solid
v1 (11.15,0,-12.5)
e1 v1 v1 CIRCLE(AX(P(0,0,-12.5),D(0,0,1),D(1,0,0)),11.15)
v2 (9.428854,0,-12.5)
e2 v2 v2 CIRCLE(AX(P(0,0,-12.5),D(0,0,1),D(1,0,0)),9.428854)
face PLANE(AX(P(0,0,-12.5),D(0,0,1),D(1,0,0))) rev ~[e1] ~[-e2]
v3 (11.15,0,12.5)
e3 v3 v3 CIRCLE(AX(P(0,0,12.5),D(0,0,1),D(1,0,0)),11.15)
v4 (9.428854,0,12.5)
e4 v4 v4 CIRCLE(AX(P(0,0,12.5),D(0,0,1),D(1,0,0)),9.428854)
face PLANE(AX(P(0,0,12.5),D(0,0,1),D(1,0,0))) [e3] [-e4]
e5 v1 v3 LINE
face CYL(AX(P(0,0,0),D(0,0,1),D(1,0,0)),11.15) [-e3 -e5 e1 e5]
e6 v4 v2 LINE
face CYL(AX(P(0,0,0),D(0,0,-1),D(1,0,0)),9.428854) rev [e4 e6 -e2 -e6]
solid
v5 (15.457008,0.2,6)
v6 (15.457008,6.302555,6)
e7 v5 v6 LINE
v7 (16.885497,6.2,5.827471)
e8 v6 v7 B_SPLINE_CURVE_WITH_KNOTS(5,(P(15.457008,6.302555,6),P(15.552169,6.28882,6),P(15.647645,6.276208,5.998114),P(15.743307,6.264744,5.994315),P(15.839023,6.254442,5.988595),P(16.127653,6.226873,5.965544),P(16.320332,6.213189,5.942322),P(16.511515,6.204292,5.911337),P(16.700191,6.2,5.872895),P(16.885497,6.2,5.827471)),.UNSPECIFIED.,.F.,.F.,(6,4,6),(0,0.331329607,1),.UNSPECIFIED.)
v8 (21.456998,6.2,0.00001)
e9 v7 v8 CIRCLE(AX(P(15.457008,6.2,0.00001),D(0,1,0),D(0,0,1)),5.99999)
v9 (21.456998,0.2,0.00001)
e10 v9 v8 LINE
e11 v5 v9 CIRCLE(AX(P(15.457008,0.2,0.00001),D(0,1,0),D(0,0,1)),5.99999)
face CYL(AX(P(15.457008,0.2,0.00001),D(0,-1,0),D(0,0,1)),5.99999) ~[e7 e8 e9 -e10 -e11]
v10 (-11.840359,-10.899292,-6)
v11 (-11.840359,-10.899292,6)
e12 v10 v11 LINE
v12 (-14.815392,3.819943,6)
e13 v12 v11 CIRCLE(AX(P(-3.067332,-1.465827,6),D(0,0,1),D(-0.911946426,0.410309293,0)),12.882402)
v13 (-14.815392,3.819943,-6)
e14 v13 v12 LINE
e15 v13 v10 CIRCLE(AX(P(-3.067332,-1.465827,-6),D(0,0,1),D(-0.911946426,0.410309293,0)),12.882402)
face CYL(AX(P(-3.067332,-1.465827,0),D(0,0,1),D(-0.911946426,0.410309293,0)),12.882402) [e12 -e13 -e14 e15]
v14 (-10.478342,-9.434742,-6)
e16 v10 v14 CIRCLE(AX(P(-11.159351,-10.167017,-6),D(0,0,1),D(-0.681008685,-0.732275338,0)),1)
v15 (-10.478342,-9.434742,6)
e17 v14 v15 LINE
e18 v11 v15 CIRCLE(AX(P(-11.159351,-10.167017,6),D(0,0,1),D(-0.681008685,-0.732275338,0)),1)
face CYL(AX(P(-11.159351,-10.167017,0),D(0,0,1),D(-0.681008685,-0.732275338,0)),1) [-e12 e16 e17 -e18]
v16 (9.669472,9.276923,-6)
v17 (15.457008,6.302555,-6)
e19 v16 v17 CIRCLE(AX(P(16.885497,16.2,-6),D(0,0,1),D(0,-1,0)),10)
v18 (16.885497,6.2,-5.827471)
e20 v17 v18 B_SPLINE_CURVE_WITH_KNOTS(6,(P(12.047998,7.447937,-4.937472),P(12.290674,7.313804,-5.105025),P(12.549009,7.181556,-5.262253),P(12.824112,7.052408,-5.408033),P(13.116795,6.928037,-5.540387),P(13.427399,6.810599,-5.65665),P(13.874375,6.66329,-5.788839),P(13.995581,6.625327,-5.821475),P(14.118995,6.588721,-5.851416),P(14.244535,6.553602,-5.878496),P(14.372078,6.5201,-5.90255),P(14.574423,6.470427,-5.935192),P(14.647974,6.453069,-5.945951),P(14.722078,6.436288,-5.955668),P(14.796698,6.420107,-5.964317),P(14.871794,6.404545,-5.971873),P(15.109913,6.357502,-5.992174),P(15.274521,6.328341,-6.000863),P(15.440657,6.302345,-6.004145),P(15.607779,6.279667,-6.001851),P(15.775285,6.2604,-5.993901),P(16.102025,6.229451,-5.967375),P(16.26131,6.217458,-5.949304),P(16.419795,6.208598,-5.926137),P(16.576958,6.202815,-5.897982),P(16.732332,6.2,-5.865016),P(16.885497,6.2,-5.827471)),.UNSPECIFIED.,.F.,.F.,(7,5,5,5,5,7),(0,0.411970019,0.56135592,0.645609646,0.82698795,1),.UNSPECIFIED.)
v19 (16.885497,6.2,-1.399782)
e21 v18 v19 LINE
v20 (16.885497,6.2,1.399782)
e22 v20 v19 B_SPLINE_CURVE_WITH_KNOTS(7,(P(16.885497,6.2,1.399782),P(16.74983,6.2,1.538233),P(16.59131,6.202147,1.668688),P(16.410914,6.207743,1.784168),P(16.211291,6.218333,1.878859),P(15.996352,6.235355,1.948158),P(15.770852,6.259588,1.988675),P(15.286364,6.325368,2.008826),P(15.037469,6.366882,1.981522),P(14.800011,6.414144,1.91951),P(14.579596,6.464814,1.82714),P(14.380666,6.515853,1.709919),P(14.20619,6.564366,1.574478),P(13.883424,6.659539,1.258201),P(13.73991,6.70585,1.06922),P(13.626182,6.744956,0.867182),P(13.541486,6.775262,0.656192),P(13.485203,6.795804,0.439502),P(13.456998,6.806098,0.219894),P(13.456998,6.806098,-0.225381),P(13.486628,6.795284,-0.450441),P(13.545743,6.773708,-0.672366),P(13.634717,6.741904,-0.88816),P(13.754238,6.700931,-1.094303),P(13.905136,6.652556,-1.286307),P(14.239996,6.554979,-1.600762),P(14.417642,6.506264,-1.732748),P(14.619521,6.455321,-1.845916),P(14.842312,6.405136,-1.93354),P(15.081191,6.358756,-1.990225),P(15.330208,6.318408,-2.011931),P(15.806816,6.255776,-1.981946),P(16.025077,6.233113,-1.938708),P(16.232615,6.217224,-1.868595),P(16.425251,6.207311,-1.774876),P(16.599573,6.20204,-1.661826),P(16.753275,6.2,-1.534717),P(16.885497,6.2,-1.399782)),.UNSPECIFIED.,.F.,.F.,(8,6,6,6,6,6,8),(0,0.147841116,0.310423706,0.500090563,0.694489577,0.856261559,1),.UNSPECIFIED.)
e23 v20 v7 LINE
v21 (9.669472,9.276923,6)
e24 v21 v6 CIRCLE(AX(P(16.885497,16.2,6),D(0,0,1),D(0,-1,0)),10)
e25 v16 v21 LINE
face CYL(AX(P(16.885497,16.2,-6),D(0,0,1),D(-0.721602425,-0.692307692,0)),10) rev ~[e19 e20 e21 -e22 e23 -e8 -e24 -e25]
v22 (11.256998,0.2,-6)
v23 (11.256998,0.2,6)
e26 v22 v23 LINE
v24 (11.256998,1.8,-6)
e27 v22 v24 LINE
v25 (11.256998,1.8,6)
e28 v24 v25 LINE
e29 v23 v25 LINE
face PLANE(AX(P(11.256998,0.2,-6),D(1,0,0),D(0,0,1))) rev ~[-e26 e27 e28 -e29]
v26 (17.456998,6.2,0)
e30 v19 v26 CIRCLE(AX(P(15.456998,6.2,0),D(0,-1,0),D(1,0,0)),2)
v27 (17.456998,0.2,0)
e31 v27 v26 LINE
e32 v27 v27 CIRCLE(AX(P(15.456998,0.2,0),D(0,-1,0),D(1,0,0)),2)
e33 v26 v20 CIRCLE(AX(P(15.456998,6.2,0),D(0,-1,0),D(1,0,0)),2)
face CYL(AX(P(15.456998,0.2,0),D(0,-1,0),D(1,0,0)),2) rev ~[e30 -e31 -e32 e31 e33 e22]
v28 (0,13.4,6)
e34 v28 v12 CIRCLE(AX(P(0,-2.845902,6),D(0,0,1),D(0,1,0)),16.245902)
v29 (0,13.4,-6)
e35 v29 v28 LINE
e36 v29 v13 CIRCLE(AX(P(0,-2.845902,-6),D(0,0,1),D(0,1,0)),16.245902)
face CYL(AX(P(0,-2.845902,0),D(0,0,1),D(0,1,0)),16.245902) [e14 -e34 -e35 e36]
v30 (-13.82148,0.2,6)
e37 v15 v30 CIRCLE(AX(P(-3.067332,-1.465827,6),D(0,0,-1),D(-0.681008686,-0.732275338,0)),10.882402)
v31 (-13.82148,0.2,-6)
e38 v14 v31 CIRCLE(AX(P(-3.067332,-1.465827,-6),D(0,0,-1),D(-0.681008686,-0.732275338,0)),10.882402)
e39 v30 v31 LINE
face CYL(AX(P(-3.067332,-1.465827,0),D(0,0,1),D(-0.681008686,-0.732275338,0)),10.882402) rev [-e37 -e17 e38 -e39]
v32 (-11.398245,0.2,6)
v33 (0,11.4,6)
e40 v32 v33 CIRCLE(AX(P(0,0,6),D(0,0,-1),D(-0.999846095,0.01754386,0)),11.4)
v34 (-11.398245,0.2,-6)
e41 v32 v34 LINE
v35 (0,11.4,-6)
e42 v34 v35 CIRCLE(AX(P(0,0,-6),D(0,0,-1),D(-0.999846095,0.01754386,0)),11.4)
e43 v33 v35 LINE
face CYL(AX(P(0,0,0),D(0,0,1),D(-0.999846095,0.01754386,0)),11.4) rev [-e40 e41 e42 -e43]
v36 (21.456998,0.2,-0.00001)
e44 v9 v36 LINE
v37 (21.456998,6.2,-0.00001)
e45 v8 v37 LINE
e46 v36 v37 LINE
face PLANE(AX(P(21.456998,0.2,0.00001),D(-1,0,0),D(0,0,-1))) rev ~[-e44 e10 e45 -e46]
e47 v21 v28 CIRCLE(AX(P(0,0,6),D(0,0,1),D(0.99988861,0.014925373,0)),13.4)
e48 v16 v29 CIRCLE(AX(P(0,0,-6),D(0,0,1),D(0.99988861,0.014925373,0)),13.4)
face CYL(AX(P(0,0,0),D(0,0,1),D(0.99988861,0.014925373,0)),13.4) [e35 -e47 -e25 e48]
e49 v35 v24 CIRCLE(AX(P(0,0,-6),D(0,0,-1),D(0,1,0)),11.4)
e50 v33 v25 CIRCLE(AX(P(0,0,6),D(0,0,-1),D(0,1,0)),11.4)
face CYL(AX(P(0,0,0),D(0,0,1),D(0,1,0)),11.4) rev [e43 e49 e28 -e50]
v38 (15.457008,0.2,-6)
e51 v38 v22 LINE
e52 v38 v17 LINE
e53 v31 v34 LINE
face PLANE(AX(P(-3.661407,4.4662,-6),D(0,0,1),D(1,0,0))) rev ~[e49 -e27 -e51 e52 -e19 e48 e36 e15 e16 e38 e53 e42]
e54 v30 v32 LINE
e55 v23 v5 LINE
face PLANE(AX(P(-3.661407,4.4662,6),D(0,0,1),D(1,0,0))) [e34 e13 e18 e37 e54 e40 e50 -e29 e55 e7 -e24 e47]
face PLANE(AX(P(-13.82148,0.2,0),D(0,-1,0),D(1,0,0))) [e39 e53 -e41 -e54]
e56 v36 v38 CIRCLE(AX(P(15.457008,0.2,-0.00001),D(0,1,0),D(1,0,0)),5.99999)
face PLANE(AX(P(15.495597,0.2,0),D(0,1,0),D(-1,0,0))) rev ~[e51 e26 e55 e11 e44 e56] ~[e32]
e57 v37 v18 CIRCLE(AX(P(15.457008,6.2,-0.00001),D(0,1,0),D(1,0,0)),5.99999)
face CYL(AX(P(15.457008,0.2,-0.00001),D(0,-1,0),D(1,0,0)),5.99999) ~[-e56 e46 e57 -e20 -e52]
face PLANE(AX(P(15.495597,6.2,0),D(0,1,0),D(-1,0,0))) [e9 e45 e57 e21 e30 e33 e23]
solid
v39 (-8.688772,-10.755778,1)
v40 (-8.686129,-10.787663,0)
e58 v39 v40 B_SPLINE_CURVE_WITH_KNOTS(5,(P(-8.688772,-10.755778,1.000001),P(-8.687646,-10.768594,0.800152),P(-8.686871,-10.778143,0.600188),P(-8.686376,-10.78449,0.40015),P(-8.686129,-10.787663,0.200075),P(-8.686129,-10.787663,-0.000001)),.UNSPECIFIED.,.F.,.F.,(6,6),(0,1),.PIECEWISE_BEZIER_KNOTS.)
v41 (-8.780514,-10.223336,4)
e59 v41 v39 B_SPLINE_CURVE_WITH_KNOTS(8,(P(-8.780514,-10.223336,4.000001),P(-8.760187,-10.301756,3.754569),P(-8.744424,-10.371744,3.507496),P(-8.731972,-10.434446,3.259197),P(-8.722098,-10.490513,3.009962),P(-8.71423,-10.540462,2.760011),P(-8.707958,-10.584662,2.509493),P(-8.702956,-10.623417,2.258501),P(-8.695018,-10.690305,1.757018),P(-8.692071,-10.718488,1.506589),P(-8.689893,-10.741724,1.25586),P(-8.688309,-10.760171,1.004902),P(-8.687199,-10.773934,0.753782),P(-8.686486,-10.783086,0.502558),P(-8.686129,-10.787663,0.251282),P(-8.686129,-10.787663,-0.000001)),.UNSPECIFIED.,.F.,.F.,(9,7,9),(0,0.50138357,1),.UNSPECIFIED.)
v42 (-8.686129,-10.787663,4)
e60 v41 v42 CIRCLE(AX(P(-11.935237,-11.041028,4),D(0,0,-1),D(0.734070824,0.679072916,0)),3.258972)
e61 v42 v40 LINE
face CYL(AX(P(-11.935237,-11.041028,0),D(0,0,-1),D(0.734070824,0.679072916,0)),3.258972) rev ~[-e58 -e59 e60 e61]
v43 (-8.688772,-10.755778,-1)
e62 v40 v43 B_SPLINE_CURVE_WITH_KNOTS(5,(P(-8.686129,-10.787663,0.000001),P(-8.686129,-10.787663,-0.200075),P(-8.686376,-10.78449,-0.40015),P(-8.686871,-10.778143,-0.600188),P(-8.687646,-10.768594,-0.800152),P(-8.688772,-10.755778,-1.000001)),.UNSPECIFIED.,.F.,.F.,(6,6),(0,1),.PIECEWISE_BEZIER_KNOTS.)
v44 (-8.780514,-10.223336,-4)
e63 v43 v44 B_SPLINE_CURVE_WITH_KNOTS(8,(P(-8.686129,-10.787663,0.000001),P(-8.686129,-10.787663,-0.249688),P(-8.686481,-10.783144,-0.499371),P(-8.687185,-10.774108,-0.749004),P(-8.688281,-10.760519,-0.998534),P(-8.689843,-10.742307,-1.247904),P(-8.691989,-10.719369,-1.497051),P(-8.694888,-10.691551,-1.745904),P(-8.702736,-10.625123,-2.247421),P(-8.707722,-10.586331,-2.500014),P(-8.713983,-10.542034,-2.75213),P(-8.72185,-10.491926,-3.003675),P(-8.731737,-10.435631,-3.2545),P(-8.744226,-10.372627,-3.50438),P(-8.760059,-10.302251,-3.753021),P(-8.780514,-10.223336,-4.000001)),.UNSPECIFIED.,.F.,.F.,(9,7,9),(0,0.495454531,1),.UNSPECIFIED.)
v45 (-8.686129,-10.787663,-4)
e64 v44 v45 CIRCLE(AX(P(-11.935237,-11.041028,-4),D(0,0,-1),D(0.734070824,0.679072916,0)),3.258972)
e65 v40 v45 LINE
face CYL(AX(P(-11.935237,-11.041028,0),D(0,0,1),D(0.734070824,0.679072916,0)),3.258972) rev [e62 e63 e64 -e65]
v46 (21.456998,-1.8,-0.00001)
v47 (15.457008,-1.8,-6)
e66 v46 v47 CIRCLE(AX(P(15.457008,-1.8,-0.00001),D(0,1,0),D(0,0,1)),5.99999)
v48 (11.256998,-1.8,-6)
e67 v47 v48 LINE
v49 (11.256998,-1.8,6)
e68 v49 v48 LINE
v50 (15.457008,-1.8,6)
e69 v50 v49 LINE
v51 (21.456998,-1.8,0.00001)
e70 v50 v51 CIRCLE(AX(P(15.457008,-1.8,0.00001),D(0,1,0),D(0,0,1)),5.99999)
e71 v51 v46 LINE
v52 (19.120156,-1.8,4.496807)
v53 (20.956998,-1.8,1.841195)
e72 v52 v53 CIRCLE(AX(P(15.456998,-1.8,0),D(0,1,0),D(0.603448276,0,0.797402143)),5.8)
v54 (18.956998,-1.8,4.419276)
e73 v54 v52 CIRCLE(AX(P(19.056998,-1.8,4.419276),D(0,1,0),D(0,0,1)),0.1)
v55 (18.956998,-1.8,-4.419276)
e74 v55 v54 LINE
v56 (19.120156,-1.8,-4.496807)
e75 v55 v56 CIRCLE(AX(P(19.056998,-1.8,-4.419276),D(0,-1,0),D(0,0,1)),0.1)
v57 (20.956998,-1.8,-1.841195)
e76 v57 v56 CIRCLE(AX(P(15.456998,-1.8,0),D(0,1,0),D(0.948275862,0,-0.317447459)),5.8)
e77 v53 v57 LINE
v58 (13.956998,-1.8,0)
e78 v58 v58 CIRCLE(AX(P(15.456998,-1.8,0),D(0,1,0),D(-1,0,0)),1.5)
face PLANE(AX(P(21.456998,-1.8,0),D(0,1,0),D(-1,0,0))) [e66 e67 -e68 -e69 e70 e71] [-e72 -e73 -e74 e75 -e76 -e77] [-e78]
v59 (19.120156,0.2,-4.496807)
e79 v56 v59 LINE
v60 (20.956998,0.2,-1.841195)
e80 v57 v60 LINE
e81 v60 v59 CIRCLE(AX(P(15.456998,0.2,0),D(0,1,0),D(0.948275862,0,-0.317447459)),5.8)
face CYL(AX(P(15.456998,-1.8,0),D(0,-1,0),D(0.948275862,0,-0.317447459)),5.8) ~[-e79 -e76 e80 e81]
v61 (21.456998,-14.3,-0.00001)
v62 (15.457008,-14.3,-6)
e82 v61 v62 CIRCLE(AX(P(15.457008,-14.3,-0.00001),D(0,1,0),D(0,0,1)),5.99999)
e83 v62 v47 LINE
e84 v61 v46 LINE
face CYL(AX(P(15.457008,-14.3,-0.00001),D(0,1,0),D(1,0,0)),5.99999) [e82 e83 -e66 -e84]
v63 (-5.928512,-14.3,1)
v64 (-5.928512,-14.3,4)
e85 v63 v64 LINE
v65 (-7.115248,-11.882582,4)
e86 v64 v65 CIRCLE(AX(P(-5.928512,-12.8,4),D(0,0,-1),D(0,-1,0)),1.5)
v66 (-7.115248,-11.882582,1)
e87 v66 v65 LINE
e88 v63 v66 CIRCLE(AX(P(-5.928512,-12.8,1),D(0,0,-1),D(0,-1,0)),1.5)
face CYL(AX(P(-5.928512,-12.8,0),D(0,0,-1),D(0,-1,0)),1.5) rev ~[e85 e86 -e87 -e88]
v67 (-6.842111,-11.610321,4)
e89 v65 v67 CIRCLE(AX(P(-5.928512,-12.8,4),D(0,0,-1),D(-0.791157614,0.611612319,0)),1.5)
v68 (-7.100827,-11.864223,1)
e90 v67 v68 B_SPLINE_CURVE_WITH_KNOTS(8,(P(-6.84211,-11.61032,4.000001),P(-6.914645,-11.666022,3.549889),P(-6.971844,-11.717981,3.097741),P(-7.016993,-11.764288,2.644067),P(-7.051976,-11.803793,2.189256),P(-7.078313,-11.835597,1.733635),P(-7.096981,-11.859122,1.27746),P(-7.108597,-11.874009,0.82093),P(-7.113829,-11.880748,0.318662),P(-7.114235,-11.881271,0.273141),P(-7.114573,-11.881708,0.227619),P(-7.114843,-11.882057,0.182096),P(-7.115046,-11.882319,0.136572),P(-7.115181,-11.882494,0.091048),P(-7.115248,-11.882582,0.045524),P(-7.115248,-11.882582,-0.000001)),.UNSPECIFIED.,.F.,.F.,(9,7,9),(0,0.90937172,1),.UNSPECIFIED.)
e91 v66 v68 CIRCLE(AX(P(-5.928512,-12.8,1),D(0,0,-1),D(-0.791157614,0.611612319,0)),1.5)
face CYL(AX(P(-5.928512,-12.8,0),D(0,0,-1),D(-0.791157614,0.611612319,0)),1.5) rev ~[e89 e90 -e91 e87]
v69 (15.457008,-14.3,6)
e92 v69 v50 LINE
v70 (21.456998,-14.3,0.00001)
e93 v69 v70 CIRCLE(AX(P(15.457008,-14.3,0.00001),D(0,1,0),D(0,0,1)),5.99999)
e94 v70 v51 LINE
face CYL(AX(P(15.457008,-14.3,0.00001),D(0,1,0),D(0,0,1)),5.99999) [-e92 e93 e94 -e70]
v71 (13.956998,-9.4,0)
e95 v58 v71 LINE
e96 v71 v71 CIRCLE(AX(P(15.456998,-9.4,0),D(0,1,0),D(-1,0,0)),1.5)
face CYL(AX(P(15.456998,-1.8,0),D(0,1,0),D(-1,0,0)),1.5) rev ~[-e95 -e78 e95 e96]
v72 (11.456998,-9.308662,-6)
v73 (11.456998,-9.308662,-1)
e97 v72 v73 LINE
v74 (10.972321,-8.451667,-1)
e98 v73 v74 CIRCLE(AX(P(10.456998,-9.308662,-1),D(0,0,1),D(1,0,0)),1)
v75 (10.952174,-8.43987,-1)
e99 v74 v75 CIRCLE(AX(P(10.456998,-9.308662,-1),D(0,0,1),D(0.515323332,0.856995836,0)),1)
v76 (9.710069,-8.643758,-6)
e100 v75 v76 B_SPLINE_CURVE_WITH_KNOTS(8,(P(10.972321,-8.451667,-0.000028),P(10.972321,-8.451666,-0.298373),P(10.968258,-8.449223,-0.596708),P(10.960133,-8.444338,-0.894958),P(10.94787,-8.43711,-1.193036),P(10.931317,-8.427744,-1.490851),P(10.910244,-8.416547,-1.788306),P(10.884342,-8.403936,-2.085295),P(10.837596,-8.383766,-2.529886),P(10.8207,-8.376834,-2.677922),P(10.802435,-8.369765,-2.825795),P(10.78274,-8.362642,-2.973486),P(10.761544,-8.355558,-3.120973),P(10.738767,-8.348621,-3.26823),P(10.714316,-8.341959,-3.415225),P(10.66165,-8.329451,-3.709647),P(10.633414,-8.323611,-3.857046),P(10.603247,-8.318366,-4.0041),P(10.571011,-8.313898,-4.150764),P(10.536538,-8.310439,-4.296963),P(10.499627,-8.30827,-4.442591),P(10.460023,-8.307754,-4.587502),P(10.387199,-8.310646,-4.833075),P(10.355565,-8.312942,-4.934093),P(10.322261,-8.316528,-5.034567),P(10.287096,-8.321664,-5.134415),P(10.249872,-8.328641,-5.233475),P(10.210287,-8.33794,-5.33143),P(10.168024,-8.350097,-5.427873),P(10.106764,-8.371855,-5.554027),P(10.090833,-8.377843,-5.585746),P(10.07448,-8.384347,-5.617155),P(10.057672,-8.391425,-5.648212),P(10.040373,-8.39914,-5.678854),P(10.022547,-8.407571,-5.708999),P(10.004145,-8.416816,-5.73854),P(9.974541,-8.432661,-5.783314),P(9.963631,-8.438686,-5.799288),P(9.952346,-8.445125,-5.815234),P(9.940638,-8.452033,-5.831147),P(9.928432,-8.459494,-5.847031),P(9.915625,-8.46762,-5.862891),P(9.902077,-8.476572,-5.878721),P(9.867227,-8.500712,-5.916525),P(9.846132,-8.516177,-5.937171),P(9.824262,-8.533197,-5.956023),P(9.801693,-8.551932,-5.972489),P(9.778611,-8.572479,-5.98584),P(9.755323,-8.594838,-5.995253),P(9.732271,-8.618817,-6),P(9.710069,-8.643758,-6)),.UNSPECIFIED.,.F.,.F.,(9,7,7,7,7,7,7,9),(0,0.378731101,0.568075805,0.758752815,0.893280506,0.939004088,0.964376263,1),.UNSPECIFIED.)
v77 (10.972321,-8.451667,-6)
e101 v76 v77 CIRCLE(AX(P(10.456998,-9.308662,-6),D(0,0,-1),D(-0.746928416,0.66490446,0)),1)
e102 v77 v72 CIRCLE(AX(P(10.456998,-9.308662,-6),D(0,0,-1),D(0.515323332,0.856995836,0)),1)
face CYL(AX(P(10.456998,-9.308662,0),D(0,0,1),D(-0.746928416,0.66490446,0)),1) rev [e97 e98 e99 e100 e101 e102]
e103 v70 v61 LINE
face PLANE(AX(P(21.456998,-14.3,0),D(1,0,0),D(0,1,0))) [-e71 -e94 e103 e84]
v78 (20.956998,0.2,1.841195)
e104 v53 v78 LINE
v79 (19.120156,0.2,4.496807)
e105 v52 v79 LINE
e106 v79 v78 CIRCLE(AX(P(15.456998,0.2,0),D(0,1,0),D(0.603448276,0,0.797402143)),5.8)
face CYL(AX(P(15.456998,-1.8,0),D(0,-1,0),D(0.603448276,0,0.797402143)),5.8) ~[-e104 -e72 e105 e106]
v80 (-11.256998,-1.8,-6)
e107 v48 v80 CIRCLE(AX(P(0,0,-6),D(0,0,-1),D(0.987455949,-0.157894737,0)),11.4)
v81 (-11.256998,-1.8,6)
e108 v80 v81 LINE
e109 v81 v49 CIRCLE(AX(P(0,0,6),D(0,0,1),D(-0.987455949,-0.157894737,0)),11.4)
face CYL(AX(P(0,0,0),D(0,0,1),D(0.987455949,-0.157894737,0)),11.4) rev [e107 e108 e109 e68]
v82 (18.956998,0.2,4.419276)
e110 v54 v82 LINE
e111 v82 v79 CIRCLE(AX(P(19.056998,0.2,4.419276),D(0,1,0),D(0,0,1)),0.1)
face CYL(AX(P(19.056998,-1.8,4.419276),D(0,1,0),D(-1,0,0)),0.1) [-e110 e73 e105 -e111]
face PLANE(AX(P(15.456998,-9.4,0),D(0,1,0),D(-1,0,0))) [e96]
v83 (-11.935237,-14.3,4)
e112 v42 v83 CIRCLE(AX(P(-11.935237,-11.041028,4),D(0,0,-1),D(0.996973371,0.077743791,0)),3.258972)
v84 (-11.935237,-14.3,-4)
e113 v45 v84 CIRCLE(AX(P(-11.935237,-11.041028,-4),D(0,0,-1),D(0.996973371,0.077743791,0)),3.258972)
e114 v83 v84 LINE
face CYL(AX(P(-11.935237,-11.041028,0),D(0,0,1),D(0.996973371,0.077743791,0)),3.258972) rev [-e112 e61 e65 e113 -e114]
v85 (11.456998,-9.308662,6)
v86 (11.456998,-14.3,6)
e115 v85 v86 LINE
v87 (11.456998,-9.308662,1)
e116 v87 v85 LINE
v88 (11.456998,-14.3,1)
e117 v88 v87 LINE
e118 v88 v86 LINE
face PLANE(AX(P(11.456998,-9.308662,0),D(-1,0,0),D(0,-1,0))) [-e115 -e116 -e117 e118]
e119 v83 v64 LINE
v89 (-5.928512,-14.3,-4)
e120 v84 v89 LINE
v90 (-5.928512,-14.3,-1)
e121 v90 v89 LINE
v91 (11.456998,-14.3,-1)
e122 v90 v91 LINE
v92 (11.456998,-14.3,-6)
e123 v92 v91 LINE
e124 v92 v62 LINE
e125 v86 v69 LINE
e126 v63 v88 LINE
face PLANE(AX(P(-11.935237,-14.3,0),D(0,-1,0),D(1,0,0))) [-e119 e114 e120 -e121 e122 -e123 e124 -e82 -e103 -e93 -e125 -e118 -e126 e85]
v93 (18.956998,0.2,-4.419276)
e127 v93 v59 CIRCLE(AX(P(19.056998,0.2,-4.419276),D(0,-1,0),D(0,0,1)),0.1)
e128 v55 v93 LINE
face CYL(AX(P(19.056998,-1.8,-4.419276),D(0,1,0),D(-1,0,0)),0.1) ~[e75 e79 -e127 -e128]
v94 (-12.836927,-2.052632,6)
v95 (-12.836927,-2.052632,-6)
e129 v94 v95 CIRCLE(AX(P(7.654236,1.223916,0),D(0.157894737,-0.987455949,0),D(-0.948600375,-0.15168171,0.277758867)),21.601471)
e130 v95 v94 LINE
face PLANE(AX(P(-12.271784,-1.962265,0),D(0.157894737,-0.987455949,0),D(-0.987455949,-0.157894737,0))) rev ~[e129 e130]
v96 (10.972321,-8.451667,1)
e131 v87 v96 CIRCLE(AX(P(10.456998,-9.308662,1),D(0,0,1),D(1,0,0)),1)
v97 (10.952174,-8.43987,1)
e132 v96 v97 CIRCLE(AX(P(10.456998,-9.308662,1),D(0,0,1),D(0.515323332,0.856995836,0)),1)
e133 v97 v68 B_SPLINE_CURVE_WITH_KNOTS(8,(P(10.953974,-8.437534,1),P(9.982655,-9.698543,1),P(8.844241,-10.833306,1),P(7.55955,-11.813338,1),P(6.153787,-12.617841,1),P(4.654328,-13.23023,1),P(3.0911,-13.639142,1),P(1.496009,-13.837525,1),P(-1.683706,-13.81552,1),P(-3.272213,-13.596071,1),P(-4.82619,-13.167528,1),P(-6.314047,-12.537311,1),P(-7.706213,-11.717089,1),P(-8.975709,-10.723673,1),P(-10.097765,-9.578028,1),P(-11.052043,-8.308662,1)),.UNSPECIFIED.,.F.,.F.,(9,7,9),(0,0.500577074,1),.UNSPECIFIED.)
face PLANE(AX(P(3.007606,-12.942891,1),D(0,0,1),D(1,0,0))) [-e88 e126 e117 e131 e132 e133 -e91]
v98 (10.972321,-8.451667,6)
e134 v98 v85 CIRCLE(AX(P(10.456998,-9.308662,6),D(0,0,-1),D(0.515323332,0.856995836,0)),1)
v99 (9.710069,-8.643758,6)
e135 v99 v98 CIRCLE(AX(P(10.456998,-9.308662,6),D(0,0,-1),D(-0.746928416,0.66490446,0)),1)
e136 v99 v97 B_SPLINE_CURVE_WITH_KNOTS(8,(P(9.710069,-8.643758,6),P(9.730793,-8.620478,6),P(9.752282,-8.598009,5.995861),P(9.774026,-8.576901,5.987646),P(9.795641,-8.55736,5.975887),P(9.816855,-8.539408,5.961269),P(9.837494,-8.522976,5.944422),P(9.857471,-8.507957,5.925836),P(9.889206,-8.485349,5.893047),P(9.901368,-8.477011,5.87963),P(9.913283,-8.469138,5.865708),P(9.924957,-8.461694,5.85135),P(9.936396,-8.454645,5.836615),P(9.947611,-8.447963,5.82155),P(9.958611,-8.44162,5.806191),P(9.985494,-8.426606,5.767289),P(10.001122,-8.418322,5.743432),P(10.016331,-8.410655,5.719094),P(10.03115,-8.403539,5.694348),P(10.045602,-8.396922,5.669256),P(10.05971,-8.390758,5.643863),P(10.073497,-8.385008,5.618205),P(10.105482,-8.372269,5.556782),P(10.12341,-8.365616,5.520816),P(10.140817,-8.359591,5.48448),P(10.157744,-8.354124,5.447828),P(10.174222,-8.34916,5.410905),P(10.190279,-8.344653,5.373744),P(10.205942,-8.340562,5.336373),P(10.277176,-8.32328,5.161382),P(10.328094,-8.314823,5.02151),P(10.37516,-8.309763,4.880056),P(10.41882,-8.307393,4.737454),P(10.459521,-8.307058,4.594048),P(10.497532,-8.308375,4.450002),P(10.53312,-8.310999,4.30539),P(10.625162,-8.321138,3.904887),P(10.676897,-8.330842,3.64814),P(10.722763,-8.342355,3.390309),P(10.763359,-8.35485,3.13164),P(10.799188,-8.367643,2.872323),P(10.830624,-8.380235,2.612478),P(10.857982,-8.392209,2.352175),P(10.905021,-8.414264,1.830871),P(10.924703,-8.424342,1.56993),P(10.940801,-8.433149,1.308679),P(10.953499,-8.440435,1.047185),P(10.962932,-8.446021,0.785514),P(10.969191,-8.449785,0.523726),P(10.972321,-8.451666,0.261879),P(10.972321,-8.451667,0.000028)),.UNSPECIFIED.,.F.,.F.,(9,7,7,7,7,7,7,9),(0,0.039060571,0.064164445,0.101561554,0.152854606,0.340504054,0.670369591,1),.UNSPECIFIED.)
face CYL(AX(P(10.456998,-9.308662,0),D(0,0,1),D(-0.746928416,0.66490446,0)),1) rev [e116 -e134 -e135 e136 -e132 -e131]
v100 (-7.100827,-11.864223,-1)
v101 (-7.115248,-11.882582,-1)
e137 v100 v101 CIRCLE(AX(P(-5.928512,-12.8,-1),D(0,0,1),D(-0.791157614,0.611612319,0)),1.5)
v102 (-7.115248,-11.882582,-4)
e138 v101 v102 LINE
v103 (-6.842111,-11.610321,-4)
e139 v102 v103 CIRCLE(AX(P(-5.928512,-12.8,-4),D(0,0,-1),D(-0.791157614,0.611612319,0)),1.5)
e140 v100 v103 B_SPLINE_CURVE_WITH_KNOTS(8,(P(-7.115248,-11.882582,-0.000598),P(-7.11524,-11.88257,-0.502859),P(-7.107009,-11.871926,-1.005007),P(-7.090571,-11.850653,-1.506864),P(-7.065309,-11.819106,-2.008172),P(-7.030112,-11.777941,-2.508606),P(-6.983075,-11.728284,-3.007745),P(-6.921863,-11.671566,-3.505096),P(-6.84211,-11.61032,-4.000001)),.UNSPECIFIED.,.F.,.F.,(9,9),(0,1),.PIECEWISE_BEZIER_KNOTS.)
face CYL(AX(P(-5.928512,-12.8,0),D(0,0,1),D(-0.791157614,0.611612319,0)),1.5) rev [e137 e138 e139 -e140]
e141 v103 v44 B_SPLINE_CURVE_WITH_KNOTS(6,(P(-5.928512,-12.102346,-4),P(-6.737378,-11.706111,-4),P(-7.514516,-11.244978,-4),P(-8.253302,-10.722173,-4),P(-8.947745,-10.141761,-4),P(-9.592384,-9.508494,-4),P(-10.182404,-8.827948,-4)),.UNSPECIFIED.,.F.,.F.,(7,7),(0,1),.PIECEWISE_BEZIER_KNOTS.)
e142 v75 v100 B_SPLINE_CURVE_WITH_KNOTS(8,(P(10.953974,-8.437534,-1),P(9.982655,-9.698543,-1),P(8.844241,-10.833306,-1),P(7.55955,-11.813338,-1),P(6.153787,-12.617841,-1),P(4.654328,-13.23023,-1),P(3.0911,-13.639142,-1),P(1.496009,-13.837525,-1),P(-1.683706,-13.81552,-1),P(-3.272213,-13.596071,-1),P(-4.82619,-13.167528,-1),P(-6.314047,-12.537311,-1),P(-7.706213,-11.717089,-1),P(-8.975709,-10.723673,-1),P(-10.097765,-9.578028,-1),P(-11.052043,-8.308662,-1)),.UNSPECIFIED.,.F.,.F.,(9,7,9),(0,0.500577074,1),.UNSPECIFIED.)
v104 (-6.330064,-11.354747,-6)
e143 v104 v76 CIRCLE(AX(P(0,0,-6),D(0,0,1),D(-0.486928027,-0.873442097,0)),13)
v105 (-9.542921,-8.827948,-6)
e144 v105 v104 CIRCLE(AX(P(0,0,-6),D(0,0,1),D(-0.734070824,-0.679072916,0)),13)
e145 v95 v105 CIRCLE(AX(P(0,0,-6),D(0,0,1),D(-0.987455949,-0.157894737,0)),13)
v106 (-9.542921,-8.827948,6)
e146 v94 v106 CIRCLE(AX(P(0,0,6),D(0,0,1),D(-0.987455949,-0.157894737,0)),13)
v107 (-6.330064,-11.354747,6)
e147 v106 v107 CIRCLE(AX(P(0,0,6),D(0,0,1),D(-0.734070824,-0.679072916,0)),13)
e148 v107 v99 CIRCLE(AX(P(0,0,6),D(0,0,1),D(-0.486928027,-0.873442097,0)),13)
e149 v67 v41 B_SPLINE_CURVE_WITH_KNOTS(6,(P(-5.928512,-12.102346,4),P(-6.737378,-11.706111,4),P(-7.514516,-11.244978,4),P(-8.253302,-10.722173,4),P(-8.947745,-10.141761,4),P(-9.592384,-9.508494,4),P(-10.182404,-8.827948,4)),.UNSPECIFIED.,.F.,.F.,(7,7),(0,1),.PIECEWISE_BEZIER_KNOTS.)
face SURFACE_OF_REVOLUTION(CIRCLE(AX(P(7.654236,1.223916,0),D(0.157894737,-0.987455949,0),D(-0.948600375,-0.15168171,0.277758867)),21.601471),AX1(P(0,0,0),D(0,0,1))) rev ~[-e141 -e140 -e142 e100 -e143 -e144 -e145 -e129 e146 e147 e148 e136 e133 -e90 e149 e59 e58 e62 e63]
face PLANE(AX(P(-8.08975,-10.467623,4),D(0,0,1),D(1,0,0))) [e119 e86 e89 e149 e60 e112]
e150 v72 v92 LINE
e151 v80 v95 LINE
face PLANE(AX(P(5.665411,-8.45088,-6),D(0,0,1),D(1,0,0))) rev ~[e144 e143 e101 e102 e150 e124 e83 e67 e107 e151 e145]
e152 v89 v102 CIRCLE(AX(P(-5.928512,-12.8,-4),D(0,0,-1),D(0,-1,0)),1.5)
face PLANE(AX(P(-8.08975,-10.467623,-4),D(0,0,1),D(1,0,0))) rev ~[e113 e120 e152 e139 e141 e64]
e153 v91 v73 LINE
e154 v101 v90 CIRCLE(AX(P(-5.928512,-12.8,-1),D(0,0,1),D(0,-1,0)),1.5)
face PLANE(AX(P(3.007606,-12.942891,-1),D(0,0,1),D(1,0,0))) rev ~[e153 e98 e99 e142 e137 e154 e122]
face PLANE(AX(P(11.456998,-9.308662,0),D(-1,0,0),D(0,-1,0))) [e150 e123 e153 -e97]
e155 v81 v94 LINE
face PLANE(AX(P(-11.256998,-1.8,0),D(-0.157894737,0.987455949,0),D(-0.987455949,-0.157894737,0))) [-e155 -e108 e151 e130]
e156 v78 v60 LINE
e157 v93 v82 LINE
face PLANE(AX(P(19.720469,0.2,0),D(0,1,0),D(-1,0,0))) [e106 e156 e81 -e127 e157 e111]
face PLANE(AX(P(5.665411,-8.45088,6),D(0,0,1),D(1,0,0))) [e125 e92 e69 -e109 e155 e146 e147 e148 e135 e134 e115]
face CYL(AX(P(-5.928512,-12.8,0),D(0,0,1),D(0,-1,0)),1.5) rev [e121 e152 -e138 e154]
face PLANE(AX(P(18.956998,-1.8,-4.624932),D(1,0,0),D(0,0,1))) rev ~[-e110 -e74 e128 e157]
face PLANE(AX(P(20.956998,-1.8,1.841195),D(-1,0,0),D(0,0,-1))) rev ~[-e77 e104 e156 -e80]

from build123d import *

# Parameters (mm, degrees)
F0_R      = 11.15
F0_R_2    = 9.4288540256
F1_DEPTH  = 12.5
F4_DEPTH  = 6
F6_DEPTH  = 1
F7_DEPTH  = 4
F8_R      = 5.99999
F9_START  = 2
F9_DEPTH  = 6
F11_DEPTH = 2
F12_R     = 0.1
F10_R     = 1.5
F13_DEPTH = 7.6
F15_DEPTH = 6
F16_R     = 10
F17_R     = 2
F18_DEPTH = 25


# Not quite as in the source:
# - a fillet or chamfer is up to 0.001 mm smaller than in the source, because OpenCascade refuses the exact size


with BuildPart() as f1:
    # F0 (on Top) → F1 (new body, symmetric)
    with BuildSketch(Plane.XY):
        Circle(F0_R)
        Circle(F0_R_2, mode=Mode.SUBTRACT)
    extrude(amount=F1_DEPTH, both=True)


with BuildPart() as f4:
    # F2 (on Top) → F4 (new body, symmetric)
    with BuildSketch(Plane.XY):
        with BuildLine():
            ThreePointArc((11.2569978236, -1.8), (0, -11.4), (-11.2569978236, -1.8))
            Line((-11.2569978236, -1.8), (-12.8369273427, -2.0526315789))
            ThreePointArc((-12.8369273427, -2.0526315789), (-11.6914767069, -5.6841333915), (-9.5429207129, -8.827947908))
            ThreePointArc((-9.5429207129, -8.827947908), (-8.0364228667, -10.2184102241), (-6.3300643569, -11.3547472555))
            ThreePointArc((-6.3300643569, -11.3547472555), (2.1664427623, -12.8182107081), (9.7100694076, -8.6437579848))
            ThreePointArc((9.7100694076, -8.6437579848), (10.3065484867, -8.3200447248), (10.9723211553, -8.4516666087))
            ThreePointArc((10.9723211553, -8.4516666087), (11.3274354525, -8.8163837293), (11.4569978236, -9.3086624451))
            Line((11.4569978236, -9.3086624451), (11.4569978236, -14.3))
            Line((11.4569978236, -14.3), (21.4569978236, -14.3))
            Line((21.4569978236, -14.3), (21.4569978236, -1.8))
            Line((21.4569978236, -1.8), (11.2569978236, -1.8))
        make_face()
    extrude(amount=F4_DEPTH, both=True)

    # F5: sweep along a path in F2
    with BuildLine(Plane.XY) as f5_path:
        ThreePointArc((-13.6762648997, -2.1868421053), (-3.4117201611, -13.4232136816), (10.9723211553, -8.4516666087))
    # F3 (on Right) → F5 (sweep)
    with BuildSketch(Plane.YZ):
        with BuildLine():
            Line((-11.4, -6), (-11.4, 6))
            Line((-11.4, 6), (-13, 6))
            ThreePointArc((-13, 6), (-13.85, 0), (-13, -6))
            Line((-13, -6), (-11.4, -6))
        make_face()
    sweep(path=f5_path.line)

    # F2 (on Top) → F6 (join, symmetric)
    with BuildSketch(Plane.XY):
        with BuildLine():
            Line((-5.9285117394, -14.3), (11.4569978236, -14.3))
            Line((11.4569978236, -14.3), (11.4569978236, -9.3086624451))
            ThreePointArc((11.4569978236, -9.3086624451), (11.3274354525, -8.8163837293), (10.9723211553, -8.4516666087))
            ThreePointArc((10.9723211553, -8.4516666087), (2.5810942069, -13.6073675887), (-7.1152481611, -11.8825815211))
            ThreePointArc((-7.1152481611, -11.8825815211), (-7.2750123369, -13.4610114529), (-5.9285117394, -14.3))
        make_face()
        with BuildLine():
            ThreePointArc((9.7100694076, -8.6437579848), (2.1664427623, -12.8182107081), (-6.3300643569, -11.3547472555))
            ThreePointArc((-6.3300643569, -11.3547472555), (-6.7653616489, -11.5551376667), (-7.1152481611, -11.8825815211))
            ThreePointArc((-7.1152481611, -11.8825815211), (2.5810942069, -13.6073675887), (10.9723211553, -8.4516666087))
            ThreePointArc((10.9723211553, -8.4516666087), (10.3065484867, -8.3200447248), (9.7100694076, -8.6437579848))
        make_face()
        with BuildLine():
            ThreePointArc((-6.3300643569, -11.3547472555), (-8.0364228667, -10.2184102241), (-9.5429207129, -8.827947908))
            ThreePointArc((-9.5429207129, -8.827947908), (-8.9491796093, -9.7355161295), (-8.6861285989, -10.7876628592))
            ThreePointArc((-8.6861285989, -10.7876628592), (-7.91963311, -11.3623022052), (-7.1152481611, -11.8825815211))
            ThreePointArc((-7.1152481611, -11.8825815211), (-6.7653616489, -11.5551376667), (-6.3300643569, -11.3547472555))
        make_face()
        with BuildLine():
            ThreePointArc((-7.1152481611, -11.8825815211), (-7.91963311, -11.3623022052), (-8.6861285989, -10.7876628592))
            ThreePointArc((-8.6861285989, -10.7876628592), (-9.5428942517, -13.2540789242), (-11.9352371812, -14.3))
            Line((-11.9352371812, -14.3), (-5.9285117394, -14.3))
            ThreePointArc((-5.9285117394, -14.3), (-7.2750123369, -13.4610114529), (-7.1152481611, -11.8825815211))
        make_face()
    extrude(amount=F6_DEPTH, both=True)

    # F2 (on Top) → F7 (join, symmetric)
    with BuildSketch(Plane.XY):
        with BuildLine():
            ThreePointArc((-6.3300643569, -11.3547472555), (-8.0364228667, -10.2184102241), (-9.5429207129, -8.827947908))
            ThreePointArc((-9.5429207129, -8.827947908), (-8.9491796093, -9.7355161295), (-8.6861285989, -10.7876628592))
            ThreePointArc((-8.6861285989, -10.7876628592), (-7.91963311, -11.3623022052), (-7.1152481611, -11.8825815211))
            ThreePointArc((-7.1152481611, -11.8825815211), (-6.7653616489, -11.5551376667), (-6.3300643569, -11.3547472555))
        make_face()
        with BuildLine():
            ThreePointArc((-7.1152481611, -11.8825815211), (-7.91963311, -11.3623022052), (-8.6861285989, -10.7876628592))
            ThreePointArc((-8.6861285989, -10.7876628592), (-9.5428942517, -13.2540789242), (-11.9352371812, -14.3))
            Line((-11.9352371812, -14.3), (-5.9285117394, -14.3))
            ThreePointArc((-5.9285117394, -14.3), (-7.2750123369, -13.4610114529), (-7.1152481611, -11.8825815211))
        make_face()
    extrude(amount=F7_DEPTH, both=True)

    # F8 (radius 6 in the source; OpenCascade refuses exactly that, so slightly less here)
    f8_edges = [f4.edges().sort_by_distance(p)[0] for p in [
        (21.456998, -8.05, 6),
        (21.456998, -8.05, -6),
    ]]
    fillet(f8_edges, radius=F8_R)

    # F10 (on face) → F11 (join)
    with BuildSketch(Plane(origin=(0, -1.8, 0), x_dir=(-1, 0, 0), z_dir=(0, 1, 0))):
        with BuildLine():
            Line((-18.9569978236, -4.6249324319), (-18.9569978236, 4.6249324319))
            ThreePointArc((-18.9569978236, 4.6249324319), (-20.1673373183, 3.3841840737), (-20.9569978236, 1.841195264))
            Line((-20.9569978236, 1.841195264), (-20.9569978236, -1.841195264))
            ThreePointArc((-20.9569978236, -1.841195264), (-20.1673373183, -3.3841840737), (-18.9569978236, -4.6249324319))
        make_face()
    extrude(amount=F11_DEPTH)

    # F12
    f12_edges = [f4.edges().sort_by_distance(p)[0] for p in [
        (18.956998, -0.8, 4.624932),
        (18.956998, -0.8, -4.624932),
    ]]
    fillet(f12_edges, radius=F12_R)

    # F10 (on face) → F13 (cut)
    with BuildSketch(Plane(origin=(0, -1.8, 0), x_dir=(-1, 0, 0), z_dir=(0, 1, 0))):
        with Locations((-15.4569978236, 0)):
            Circle(F10_R)
    extrude(amount=-F13_DEPTH, mode=Mode.SUBTRACT)


with BuildPart() as f9:
    # F4_face (on face) → F9 (new body)
    with BuildSketch(Plane(origin=(15.8138062617, -1.8, 0), x_dir=(-1, 0, 0), z_dir=(0, 1, 0)).offset(F9_START)):
        with BuildLine():
            Line((-5.6431915618, 1e-05), (-5.6431915618, -1e-05))
            ThreePointArc((-5.6431915618, -1e-05), (-3.8858351779, -4.2426436161), (0.3567984382, -6))
            Line((0.3567984382, -6), (4.5568084382, -6))
            Line((4.5568084382, -6), (4.5568084382, 6))
            Line((4.5568084382, 6), (0.3567984382, 6))
            ThreePointArc((0.3567984382, 6), (-3.8858351779, 4.2426436161), (-5.6431915618, 1e-05))
        make_face()
    extrude(amount=F9_DEPTH)

    # F14 (on Top) → F15 (join, symmetric)
    with BuildSketch(Plane.XY):
        with BuildLine():
            ThreePointArc((0, 11.4), (7.9899937422, 8.1314205401), (11.398245479, 0.2))
            Line((11.398245479, 0.2), (13.3985073796, 0.2))
            ThreePointArc((13.3985073796, 0.2), (9.4042543564, 9.545679651), (0, 13.4))
            ThreePointArc((0, 13.4), (-8.8214702408, 10.7963483499), (-14.8153922738, 3.8199425569))
            ThreePointArc((-14.8153922738, 3.8199425569), (-15.6943952458, -4.017992702), (-11.8403594103, -10.8992922251))
            ThreePointArc((-11.8403594103, -10.8992922251), (-10.4270753871, -10.8480255729), (-10.4783420392, -9.4347415497))
            ThreePointArc((-10.4783420392, -9.4347415497), (-13.3483970384, -5.0332308443), (-13.8214796077, 0.2))
            ThreePointArc((-13.8214796077, 0.2), (-13.5007989075, 1.6276240681), (-12.9914994214, 2.9993239714))
            ThreePointArc((-12.9914994214, 2.9993239714), (-7.7354769561, 9.1168786164), (0, 11.4))
        make_face()
        with BuildLine():
            ThreePointArc((-11.398245479, 0.2), (-7.9899937422, 8.1314205401), (0, 11.4))
            ThreePointArc((0, 11.4), (-7.7354769561, 9.1168786164), (-12.9914994214, 2.9993239714))
            ThreePointArc((-12.9914994214, 2.9993239714), (-13.5007989075, 1.6276240681), (-13.8214796077, 0.2))
            Line((-13.8214796077, 0.2), (-11.398245479, 0.2))
        make_face()
    extrude(amount=F15_DEPTH, both=True)

    # F16
    f16_edges = [f9.edges().sort_by_distance(p)[0] for p in [
        (11.879394, 6.2, 0),
    ]]
    fillet(f16_edges, radius=F16_R)

    # F17 (on face) → F18 (cut)
    with BuildSketch(Plane.XZ.offset(-0.2)):
        with Locations((15.4569978236, 0)):
            Circle(F17_R)
    extrude(amount=-F18_DEPTH, mode=Mode.SUBTRACT)


solid = Compound([f1.part, f4.part, f9.part])
